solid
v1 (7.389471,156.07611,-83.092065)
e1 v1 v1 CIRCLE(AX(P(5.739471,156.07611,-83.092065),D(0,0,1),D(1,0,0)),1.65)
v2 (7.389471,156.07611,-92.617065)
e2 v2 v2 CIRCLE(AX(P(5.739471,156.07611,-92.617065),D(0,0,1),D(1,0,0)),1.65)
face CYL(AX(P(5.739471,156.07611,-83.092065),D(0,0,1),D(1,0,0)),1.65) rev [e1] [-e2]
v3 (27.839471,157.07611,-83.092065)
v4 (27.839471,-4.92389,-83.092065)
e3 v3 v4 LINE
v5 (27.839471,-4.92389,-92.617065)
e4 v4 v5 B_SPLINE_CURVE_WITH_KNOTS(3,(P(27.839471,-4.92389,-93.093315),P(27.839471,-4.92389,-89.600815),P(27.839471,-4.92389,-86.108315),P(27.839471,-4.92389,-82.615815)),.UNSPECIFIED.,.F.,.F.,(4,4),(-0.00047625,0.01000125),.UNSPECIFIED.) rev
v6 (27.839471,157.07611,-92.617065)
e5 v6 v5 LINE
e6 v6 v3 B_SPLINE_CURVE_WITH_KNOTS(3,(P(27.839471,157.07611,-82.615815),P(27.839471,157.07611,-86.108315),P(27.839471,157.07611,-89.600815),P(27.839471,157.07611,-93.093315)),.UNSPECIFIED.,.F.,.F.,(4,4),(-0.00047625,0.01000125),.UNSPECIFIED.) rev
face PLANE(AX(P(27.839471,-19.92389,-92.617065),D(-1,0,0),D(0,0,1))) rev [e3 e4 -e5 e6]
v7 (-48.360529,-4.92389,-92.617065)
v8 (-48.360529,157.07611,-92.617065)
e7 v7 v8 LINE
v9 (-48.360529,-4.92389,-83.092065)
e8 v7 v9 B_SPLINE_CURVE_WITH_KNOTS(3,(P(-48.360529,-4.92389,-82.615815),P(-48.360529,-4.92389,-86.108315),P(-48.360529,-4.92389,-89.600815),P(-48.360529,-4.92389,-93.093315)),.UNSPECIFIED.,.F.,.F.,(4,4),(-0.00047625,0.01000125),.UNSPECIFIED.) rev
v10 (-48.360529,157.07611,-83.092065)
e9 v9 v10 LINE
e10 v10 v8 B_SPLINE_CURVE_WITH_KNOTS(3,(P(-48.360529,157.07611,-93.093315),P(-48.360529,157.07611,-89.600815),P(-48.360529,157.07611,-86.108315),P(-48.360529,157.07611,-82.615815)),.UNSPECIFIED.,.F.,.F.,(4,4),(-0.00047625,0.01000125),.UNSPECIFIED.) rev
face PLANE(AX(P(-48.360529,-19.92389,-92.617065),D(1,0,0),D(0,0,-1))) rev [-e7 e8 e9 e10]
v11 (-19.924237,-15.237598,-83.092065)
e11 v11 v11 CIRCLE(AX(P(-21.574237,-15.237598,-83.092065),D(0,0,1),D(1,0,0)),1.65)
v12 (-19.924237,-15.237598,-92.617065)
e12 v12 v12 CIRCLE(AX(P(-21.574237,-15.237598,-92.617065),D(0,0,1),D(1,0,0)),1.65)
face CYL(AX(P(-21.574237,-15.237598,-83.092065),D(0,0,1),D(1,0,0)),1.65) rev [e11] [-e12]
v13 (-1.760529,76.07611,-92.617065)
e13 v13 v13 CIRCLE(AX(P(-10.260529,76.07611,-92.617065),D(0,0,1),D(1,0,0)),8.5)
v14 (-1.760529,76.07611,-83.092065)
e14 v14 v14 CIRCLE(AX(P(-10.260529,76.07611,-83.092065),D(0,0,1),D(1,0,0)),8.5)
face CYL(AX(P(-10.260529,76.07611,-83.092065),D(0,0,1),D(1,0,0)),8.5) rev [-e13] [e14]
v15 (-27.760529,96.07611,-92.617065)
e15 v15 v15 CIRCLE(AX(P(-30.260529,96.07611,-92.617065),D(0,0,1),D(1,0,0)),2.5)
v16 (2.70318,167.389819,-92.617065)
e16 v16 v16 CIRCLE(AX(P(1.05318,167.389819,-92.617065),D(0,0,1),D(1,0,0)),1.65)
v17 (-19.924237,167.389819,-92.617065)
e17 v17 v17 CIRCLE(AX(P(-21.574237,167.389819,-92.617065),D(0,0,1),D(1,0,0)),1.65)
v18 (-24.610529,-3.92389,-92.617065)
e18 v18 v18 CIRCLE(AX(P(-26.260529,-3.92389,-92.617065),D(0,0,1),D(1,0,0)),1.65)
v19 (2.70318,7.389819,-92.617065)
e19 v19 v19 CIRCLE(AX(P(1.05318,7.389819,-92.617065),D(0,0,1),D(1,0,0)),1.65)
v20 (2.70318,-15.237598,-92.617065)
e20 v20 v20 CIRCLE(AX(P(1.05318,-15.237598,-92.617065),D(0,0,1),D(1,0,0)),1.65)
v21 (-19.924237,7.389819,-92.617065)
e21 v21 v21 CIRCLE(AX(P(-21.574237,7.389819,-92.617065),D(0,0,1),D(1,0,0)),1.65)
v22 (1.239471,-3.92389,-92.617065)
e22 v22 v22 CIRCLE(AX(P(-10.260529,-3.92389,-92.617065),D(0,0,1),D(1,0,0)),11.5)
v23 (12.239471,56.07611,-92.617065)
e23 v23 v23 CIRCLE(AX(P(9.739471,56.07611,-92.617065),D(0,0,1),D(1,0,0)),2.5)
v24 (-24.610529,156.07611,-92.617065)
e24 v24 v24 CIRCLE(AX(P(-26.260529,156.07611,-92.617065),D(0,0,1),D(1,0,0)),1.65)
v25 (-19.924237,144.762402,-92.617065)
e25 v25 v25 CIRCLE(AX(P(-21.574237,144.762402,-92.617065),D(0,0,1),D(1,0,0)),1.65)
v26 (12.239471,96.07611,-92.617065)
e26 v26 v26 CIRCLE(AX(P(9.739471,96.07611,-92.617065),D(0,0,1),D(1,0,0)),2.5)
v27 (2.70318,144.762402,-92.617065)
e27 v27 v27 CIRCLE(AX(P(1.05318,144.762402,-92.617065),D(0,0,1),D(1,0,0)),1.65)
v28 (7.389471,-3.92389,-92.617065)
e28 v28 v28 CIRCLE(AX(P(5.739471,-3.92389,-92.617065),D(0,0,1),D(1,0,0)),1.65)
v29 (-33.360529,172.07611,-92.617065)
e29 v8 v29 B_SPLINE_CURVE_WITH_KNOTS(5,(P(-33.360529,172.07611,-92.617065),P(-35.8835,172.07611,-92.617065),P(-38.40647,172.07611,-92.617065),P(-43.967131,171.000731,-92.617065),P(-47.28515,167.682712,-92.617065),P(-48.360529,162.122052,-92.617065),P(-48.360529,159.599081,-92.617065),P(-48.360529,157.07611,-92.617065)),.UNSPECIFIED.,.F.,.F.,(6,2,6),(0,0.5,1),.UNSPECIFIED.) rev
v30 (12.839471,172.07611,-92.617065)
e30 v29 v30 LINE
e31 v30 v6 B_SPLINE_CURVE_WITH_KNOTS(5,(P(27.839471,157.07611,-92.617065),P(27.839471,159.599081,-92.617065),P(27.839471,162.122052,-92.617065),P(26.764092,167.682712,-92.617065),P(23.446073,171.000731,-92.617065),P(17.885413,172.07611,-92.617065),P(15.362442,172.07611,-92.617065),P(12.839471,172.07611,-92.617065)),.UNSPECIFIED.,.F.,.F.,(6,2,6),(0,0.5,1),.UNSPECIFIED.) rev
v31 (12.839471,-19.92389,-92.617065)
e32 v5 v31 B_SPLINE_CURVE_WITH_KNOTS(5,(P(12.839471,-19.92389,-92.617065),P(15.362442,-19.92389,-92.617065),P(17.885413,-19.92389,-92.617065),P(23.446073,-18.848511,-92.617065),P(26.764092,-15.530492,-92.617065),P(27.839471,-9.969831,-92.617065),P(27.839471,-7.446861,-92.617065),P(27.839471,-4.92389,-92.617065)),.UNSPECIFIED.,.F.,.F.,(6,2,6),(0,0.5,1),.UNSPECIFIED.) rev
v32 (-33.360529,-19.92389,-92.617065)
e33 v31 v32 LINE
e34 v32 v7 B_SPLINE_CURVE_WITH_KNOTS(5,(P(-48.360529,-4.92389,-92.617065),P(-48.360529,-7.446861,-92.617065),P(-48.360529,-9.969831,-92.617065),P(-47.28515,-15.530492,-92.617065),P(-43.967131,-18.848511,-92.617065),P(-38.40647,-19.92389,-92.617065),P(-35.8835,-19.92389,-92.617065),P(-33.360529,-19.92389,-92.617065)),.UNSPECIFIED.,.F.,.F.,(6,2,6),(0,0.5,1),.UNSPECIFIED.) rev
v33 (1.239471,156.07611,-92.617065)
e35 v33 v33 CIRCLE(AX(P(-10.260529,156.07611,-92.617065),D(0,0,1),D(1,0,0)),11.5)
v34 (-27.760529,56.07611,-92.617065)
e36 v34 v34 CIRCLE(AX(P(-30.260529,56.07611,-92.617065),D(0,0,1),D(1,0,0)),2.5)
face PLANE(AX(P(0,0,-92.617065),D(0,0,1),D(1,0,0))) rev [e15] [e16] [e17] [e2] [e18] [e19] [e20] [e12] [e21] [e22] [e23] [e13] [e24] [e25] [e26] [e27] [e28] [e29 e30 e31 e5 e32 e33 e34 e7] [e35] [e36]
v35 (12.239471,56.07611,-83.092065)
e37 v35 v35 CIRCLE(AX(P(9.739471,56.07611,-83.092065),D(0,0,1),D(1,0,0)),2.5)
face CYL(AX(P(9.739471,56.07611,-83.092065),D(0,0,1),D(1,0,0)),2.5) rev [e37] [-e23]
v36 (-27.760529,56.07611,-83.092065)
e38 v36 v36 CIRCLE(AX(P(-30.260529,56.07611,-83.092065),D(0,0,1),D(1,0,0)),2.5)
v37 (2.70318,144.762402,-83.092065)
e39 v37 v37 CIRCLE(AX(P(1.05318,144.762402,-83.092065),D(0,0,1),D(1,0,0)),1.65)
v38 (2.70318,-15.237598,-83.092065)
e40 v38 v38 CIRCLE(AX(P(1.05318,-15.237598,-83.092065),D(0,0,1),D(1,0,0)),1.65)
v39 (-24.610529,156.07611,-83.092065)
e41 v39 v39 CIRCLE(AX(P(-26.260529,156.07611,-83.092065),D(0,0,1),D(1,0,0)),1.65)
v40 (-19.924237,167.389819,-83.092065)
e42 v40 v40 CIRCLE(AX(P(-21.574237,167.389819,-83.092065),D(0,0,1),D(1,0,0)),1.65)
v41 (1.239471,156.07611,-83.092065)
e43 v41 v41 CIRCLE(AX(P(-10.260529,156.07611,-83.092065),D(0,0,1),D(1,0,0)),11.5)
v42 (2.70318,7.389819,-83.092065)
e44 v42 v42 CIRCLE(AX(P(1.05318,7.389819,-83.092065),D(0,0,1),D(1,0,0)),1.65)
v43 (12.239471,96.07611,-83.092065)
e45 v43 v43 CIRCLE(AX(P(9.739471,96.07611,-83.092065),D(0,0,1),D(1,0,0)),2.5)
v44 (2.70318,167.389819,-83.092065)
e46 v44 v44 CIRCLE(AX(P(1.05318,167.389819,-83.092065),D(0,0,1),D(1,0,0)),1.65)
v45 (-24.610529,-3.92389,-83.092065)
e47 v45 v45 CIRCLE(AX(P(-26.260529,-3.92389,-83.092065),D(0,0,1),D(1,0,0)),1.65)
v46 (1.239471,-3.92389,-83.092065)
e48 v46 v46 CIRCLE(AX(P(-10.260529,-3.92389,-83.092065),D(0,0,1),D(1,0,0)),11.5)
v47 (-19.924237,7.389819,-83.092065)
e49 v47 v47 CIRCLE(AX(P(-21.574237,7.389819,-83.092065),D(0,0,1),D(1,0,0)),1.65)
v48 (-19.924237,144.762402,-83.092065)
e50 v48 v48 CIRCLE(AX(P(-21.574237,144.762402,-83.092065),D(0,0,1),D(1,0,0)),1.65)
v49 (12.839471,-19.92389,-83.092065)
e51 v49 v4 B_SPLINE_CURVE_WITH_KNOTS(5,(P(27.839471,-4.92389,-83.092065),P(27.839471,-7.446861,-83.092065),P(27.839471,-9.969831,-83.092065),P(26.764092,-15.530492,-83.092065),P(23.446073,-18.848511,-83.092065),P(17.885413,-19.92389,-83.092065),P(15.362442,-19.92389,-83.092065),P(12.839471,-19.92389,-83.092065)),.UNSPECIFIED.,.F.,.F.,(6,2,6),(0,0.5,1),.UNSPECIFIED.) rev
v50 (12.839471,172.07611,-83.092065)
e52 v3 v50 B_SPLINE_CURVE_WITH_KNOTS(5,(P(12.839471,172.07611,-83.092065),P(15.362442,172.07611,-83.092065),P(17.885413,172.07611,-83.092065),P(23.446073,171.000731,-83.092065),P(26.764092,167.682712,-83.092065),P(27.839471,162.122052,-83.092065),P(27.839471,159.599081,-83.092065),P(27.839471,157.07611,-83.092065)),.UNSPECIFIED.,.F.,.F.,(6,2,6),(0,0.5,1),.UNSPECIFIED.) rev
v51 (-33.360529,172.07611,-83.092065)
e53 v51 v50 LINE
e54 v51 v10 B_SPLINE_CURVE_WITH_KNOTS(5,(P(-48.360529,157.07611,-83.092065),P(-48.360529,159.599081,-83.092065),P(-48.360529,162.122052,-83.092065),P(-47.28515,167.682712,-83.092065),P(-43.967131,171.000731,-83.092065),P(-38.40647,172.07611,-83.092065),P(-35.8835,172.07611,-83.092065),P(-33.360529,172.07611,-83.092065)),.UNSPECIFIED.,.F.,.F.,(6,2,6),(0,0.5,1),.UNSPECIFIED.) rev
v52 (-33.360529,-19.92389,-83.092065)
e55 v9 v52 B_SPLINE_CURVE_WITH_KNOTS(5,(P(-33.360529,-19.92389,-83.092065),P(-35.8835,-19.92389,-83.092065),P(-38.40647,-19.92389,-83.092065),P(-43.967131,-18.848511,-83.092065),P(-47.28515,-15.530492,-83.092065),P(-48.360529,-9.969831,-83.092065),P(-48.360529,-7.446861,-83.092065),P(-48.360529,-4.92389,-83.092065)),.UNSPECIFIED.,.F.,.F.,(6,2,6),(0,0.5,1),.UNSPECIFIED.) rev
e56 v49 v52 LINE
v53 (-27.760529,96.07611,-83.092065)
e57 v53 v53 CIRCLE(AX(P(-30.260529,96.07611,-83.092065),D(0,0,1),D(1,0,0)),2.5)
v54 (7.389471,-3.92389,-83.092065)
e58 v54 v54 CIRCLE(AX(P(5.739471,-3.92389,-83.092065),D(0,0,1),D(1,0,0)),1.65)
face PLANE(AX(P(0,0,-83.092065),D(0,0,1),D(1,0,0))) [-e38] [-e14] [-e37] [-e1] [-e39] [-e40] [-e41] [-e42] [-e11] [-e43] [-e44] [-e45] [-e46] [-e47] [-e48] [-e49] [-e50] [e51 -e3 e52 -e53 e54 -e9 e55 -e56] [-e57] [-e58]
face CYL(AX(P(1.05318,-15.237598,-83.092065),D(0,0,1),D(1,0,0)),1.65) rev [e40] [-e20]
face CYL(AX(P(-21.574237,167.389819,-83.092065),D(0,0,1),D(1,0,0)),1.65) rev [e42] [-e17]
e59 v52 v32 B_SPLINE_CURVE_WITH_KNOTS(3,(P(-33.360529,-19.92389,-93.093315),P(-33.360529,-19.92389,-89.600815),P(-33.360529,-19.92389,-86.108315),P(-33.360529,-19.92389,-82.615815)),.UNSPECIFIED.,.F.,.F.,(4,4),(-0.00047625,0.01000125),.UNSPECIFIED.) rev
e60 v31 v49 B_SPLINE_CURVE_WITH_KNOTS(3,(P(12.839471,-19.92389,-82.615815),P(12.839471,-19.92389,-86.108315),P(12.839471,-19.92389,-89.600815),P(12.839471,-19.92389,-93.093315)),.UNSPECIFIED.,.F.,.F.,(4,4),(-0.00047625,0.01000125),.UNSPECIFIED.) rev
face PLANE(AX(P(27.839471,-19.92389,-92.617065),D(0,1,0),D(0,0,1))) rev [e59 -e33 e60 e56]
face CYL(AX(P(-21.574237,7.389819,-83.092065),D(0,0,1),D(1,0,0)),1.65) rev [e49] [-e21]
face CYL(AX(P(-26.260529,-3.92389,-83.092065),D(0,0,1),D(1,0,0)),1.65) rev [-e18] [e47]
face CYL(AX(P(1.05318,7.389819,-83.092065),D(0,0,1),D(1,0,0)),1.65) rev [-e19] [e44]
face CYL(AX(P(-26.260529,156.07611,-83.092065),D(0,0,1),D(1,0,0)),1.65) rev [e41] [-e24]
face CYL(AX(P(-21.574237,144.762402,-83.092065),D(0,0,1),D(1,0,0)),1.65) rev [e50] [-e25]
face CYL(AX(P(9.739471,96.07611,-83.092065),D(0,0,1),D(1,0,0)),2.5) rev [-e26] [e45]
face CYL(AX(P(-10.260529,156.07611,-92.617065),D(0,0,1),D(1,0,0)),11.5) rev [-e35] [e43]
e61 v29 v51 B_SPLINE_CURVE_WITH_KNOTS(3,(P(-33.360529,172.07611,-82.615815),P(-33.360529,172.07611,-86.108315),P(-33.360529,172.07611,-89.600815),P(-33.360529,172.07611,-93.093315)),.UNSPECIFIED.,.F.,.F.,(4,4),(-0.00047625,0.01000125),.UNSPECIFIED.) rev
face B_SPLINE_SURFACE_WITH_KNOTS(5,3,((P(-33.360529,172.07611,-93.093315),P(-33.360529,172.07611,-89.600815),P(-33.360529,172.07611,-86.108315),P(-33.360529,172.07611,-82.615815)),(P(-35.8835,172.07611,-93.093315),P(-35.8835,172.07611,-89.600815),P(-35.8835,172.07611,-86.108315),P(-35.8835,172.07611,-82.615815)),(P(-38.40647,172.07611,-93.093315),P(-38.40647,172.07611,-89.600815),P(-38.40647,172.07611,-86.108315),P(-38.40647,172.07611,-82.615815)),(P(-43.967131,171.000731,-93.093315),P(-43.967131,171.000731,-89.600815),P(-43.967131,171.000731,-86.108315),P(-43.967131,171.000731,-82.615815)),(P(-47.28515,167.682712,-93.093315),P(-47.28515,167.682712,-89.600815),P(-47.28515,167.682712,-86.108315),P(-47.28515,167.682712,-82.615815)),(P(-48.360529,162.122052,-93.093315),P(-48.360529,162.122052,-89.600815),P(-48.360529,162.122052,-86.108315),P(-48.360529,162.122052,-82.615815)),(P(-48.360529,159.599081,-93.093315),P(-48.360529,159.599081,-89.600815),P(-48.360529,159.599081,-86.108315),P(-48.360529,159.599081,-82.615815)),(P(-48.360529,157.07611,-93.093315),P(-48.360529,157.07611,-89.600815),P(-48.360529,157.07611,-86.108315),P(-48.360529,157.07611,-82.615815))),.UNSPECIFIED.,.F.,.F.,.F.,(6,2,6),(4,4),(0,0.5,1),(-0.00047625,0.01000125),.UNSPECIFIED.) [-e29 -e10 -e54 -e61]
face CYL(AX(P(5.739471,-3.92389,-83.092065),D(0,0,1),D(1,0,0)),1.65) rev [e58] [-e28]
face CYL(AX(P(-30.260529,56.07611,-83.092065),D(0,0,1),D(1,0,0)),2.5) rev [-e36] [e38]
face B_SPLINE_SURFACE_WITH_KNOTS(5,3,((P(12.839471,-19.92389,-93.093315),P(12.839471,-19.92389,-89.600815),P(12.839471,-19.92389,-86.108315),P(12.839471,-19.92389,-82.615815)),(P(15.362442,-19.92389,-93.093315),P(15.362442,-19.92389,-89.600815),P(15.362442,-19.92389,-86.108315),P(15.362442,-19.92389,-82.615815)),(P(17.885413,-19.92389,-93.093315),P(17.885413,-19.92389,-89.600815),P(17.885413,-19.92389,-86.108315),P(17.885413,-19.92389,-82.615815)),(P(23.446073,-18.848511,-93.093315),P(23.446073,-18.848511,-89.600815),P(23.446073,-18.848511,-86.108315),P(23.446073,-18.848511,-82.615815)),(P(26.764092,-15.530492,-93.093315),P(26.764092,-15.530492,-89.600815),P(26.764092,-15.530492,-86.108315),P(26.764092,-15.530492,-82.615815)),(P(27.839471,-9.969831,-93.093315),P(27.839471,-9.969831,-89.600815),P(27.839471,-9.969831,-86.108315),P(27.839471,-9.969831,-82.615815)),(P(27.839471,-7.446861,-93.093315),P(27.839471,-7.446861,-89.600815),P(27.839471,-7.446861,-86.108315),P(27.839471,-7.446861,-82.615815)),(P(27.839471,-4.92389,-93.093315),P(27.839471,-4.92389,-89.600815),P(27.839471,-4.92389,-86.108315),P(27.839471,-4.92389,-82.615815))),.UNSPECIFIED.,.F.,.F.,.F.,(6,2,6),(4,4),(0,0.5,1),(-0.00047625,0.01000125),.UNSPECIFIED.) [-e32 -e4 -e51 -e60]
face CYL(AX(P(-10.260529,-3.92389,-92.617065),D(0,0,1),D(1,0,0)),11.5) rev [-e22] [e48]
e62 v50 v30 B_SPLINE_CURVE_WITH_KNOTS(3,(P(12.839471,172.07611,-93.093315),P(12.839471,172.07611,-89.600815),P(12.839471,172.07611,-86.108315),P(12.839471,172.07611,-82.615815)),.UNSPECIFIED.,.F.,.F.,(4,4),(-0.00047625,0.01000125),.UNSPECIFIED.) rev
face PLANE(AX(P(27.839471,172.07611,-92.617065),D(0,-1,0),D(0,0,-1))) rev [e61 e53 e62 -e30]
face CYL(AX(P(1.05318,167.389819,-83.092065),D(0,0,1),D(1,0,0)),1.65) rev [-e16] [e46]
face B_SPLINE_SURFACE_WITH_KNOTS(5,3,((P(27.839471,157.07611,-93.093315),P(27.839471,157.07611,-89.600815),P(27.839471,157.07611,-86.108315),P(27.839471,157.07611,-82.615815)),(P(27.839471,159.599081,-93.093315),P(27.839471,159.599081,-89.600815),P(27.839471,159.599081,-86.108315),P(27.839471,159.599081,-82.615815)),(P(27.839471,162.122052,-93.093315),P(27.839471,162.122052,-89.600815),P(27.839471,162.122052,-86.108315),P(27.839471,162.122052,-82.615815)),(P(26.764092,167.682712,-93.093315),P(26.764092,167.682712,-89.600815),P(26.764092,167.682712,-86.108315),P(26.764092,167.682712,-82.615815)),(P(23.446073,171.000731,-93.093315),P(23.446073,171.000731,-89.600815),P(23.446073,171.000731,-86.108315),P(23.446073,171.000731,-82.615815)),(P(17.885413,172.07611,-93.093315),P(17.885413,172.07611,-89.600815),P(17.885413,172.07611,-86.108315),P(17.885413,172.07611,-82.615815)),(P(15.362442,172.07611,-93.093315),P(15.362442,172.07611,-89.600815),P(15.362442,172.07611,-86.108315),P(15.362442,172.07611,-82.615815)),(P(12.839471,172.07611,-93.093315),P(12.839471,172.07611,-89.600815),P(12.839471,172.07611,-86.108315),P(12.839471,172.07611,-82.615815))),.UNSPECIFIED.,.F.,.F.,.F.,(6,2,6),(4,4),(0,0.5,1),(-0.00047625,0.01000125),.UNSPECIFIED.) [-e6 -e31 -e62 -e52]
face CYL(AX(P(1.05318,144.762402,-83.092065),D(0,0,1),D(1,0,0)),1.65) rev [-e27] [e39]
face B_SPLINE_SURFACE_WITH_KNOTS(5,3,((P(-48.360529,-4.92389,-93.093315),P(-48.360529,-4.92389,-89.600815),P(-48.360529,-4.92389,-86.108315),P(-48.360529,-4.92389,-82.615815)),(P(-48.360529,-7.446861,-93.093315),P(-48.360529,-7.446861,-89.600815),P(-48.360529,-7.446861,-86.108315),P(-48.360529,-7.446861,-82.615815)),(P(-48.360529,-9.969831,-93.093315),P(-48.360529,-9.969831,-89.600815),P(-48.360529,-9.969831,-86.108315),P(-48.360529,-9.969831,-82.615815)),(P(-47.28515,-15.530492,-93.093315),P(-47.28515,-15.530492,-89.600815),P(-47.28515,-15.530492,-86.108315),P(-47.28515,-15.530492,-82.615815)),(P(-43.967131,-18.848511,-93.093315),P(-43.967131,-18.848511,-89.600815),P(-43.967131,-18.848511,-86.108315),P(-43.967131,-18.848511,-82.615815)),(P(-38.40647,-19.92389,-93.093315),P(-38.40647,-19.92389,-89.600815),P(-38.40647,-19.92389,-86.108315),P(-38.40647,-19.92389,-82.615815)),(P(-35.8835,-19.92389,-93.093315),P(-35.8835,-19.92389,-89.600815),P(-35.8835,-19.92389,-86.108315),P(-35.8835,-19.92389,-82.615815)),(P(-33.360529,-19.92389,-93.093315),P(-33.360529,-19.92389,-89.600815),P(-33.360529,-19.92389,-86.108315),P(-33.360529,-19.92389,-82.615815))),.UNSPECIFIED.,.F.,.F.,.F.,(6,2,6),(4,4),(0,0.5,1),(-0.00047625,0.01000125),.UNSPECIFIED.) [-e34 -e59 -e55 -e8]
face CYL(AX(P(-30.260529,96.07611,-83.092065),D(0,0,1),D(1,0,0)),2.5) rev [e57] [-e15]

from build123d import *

# Parameters (mm, degrees)
SKETCH2_W                     = 76.2
SKETCH2_H                     = 192
BOSS_EXTRUDE1_DEPTH           = 9.525
M16_CLEARANCE_HOLE1_D         = 17
M4X0_7_TAPPED_HOLE1_D         = 3.3
SKETCH9_R                     = 11.5
CUT_EXTRUDE1_DEPTH            = 179.996240317
FILLET1_SIZE                  = 15
M6X1_0_START                  = -94
M6X1_0_TAPPED_HOLE1_OUTLINE_R = 2.5
M6X1_0_TAPPED_HOLE1_DEPTH     = 12


with BuildPart() as part:
    # Sketch2 → Boss-Extrude1 (new body)
    with BuildSketch(Plane(origin=(0, 0, -83.092064992), x_dir=(-1, 0, 0), z_dir=(0, 0, -1))):
        with Locations((10.260528885, 76.076110104)):
            Rectangle(SKETCH2_W, SKETCH2_H)
    extrude(amount=BOSS_EXTRUDE1_DEPTH)

    # M16 Clearance Hole1 (through all)
    with Locations(Plane.XY.offset(-83.092064992)):
        with Locations((-10.260528885, 76.076110104)):
            Hole(M16_CLEARANCE_HOLE1_D / 2)

    # M4x0.7 Tapped Hole1 (through all)
    with Locations(Plane.XY.offset(-83.092064992)):
        with Locations((-21.574237384, 144.762401605), (-26.260528885, 156.076110104), (-21.574237384, 167.389818603), (1.053179614, 144.762401605), (5.739471115, 156.076110104), (1.053179614, 167.389818603), (1.053179614, 7.389818603), (1.053179614, -15.237598395), (-21.574237384, -15.237598395), (-26.260528885, -3.923889896), (-21.574237384, 7.389818603), (5.739471115, -3.923889896)):
            Hole(M4X0_7_TAPPED_HOLE1_D / 2)

    # Sketch9 → Cut-Extrude1 (cut, through all)
    with BuildSketch(Plane.XY.offset(-83.092064992)):
        with Locations((-10.260528885, 156.076110104)):
            Circle(SKETCH9_R)
        with Locations((-10.260528885, -3.923889896)):
            Circle(SKETCH9_R)
    extrude(amount=-CUT_EXTRUDE1_DEPTH, mode=Mode.SUBTRACT)

    # Fillet1
    # a fillet whose section is not a circle: 15 mm, written as the material it takes off along each edge
    with BuildSketch(Plane(origin=(27.839471115, 172.076110104, -45.592064992), x_dir=(0, -1, 0), z_dir=(0, 0, -1)), Plane(origin=(27.839471115, -19.923889896, -45.592064992), x_dir=(-1, 0, 0), z_dir=(0, 0, -1))) as fillet1_piece_1:
        with BuildLine():
            add(Edge.make_bspline([(FILLET1_SIZE, 0), (FILLET1_SIZE * 0.831801948466, 0), (FILLET1_SIZE * 0.663603896932, 0), (FILLET1_SIZE * 0.292893218813, FILLET1_SIZE * 0.0716919198361), (FILLET1_SIZE * 0.0716919198361, FILLET1_SIZE * 0.292893218813), (0, FILLET1_SIZE * 0.663603896932), (0, FILLET1_SIZE * 0.831801948466), (0, FILLET1_SIZE)], knots=[0, 0, 0, 0, 0, 0, 0.5, 0.5, 1, 1, 1, 1, 1, 1], degree=5))
            Line((0, FILLET1_SIZE), (0, 0))
            Line((0, 0), (FILLET1_SIZE, 0))
        make_face()
    extrude(amount=84.525, mode=Mode.SUBTRACT)
    with BuildSketch(Plane(origin=(-48.360528885, -19.923889896, -45.592064992), x_dir=(1, 0, 0), z_dir=(0, 0, -1)), Plane(origin=(-48.360528885, 172.076110104, -45.592064992), x_dir=(0, -1, 0), z_dir=(0, 0, -1))) as fillet1_piece_2:
        with BuildLine():
            add(Edge.make_bspline([(FILLET1_SIZE, 0), (FILLET1_SIZE * 0.831801948466, 0), (FILLET1_SIZE * 0.663603896932, 0), (FILLET1_SIZE * 0.292893218813, -FILLET1_SIZE * 0.0716919198361), (FILLET1_SIZE * 0.0716919198361, -FILLET1_SIZE * 0.292893218813), (0, -FILLET1_SIZE * 0.663603896932), (0, -FILLET1_SIZE * 0.831801948466), (0, -FILLET1_SIZE)], knots=[0, 0, 0, 0, 0, 0, 0.5, 0.5, 1, 1, 1, 1, 1, 1], degree=5))
            Line((0, -FILLET1_SIZE), (0, 0))
            Line((0, 0), (FILLET1_SIZE, 0))
        make_face()
    extrude(amount=84.525, mode=Mode.SUBTRACT)

    # M6x1.0 Tapped Hole1: read off the stored shape, not the designer's step
    # M6x1.0 Tapped Hole1 outline → M6x1.0 Tapped Hole1 (cut)
    with BuildSketch(Plane.XY.offset(M6X1_0_START)):
        with Locations((-30.260528885, 96.076110104)):
            Circle(M6X1_0_TAPPED_HOLE1_OUTLINE_R)
        with Locations((9.739471115, 56.076110104)):
            Circle(M6X1_0_TAPPED_HOLE1_OUTLINE_R)
        with Locations((-30.260528885, 56.076110104)):
            Circle(M6X1_0_TAPPED_HOLE1_OUTLINE_R)
        with Locations((9.739471115, 96.076110104)):
            Circle(M6X1_0_TAPPED_HOLE1_OUTLINE_R)
    extrude(amount=M6X1_0_TAPPED_HOLE1_DEPTH, mode=Mode.SUBTRACT)


solid = part.part
